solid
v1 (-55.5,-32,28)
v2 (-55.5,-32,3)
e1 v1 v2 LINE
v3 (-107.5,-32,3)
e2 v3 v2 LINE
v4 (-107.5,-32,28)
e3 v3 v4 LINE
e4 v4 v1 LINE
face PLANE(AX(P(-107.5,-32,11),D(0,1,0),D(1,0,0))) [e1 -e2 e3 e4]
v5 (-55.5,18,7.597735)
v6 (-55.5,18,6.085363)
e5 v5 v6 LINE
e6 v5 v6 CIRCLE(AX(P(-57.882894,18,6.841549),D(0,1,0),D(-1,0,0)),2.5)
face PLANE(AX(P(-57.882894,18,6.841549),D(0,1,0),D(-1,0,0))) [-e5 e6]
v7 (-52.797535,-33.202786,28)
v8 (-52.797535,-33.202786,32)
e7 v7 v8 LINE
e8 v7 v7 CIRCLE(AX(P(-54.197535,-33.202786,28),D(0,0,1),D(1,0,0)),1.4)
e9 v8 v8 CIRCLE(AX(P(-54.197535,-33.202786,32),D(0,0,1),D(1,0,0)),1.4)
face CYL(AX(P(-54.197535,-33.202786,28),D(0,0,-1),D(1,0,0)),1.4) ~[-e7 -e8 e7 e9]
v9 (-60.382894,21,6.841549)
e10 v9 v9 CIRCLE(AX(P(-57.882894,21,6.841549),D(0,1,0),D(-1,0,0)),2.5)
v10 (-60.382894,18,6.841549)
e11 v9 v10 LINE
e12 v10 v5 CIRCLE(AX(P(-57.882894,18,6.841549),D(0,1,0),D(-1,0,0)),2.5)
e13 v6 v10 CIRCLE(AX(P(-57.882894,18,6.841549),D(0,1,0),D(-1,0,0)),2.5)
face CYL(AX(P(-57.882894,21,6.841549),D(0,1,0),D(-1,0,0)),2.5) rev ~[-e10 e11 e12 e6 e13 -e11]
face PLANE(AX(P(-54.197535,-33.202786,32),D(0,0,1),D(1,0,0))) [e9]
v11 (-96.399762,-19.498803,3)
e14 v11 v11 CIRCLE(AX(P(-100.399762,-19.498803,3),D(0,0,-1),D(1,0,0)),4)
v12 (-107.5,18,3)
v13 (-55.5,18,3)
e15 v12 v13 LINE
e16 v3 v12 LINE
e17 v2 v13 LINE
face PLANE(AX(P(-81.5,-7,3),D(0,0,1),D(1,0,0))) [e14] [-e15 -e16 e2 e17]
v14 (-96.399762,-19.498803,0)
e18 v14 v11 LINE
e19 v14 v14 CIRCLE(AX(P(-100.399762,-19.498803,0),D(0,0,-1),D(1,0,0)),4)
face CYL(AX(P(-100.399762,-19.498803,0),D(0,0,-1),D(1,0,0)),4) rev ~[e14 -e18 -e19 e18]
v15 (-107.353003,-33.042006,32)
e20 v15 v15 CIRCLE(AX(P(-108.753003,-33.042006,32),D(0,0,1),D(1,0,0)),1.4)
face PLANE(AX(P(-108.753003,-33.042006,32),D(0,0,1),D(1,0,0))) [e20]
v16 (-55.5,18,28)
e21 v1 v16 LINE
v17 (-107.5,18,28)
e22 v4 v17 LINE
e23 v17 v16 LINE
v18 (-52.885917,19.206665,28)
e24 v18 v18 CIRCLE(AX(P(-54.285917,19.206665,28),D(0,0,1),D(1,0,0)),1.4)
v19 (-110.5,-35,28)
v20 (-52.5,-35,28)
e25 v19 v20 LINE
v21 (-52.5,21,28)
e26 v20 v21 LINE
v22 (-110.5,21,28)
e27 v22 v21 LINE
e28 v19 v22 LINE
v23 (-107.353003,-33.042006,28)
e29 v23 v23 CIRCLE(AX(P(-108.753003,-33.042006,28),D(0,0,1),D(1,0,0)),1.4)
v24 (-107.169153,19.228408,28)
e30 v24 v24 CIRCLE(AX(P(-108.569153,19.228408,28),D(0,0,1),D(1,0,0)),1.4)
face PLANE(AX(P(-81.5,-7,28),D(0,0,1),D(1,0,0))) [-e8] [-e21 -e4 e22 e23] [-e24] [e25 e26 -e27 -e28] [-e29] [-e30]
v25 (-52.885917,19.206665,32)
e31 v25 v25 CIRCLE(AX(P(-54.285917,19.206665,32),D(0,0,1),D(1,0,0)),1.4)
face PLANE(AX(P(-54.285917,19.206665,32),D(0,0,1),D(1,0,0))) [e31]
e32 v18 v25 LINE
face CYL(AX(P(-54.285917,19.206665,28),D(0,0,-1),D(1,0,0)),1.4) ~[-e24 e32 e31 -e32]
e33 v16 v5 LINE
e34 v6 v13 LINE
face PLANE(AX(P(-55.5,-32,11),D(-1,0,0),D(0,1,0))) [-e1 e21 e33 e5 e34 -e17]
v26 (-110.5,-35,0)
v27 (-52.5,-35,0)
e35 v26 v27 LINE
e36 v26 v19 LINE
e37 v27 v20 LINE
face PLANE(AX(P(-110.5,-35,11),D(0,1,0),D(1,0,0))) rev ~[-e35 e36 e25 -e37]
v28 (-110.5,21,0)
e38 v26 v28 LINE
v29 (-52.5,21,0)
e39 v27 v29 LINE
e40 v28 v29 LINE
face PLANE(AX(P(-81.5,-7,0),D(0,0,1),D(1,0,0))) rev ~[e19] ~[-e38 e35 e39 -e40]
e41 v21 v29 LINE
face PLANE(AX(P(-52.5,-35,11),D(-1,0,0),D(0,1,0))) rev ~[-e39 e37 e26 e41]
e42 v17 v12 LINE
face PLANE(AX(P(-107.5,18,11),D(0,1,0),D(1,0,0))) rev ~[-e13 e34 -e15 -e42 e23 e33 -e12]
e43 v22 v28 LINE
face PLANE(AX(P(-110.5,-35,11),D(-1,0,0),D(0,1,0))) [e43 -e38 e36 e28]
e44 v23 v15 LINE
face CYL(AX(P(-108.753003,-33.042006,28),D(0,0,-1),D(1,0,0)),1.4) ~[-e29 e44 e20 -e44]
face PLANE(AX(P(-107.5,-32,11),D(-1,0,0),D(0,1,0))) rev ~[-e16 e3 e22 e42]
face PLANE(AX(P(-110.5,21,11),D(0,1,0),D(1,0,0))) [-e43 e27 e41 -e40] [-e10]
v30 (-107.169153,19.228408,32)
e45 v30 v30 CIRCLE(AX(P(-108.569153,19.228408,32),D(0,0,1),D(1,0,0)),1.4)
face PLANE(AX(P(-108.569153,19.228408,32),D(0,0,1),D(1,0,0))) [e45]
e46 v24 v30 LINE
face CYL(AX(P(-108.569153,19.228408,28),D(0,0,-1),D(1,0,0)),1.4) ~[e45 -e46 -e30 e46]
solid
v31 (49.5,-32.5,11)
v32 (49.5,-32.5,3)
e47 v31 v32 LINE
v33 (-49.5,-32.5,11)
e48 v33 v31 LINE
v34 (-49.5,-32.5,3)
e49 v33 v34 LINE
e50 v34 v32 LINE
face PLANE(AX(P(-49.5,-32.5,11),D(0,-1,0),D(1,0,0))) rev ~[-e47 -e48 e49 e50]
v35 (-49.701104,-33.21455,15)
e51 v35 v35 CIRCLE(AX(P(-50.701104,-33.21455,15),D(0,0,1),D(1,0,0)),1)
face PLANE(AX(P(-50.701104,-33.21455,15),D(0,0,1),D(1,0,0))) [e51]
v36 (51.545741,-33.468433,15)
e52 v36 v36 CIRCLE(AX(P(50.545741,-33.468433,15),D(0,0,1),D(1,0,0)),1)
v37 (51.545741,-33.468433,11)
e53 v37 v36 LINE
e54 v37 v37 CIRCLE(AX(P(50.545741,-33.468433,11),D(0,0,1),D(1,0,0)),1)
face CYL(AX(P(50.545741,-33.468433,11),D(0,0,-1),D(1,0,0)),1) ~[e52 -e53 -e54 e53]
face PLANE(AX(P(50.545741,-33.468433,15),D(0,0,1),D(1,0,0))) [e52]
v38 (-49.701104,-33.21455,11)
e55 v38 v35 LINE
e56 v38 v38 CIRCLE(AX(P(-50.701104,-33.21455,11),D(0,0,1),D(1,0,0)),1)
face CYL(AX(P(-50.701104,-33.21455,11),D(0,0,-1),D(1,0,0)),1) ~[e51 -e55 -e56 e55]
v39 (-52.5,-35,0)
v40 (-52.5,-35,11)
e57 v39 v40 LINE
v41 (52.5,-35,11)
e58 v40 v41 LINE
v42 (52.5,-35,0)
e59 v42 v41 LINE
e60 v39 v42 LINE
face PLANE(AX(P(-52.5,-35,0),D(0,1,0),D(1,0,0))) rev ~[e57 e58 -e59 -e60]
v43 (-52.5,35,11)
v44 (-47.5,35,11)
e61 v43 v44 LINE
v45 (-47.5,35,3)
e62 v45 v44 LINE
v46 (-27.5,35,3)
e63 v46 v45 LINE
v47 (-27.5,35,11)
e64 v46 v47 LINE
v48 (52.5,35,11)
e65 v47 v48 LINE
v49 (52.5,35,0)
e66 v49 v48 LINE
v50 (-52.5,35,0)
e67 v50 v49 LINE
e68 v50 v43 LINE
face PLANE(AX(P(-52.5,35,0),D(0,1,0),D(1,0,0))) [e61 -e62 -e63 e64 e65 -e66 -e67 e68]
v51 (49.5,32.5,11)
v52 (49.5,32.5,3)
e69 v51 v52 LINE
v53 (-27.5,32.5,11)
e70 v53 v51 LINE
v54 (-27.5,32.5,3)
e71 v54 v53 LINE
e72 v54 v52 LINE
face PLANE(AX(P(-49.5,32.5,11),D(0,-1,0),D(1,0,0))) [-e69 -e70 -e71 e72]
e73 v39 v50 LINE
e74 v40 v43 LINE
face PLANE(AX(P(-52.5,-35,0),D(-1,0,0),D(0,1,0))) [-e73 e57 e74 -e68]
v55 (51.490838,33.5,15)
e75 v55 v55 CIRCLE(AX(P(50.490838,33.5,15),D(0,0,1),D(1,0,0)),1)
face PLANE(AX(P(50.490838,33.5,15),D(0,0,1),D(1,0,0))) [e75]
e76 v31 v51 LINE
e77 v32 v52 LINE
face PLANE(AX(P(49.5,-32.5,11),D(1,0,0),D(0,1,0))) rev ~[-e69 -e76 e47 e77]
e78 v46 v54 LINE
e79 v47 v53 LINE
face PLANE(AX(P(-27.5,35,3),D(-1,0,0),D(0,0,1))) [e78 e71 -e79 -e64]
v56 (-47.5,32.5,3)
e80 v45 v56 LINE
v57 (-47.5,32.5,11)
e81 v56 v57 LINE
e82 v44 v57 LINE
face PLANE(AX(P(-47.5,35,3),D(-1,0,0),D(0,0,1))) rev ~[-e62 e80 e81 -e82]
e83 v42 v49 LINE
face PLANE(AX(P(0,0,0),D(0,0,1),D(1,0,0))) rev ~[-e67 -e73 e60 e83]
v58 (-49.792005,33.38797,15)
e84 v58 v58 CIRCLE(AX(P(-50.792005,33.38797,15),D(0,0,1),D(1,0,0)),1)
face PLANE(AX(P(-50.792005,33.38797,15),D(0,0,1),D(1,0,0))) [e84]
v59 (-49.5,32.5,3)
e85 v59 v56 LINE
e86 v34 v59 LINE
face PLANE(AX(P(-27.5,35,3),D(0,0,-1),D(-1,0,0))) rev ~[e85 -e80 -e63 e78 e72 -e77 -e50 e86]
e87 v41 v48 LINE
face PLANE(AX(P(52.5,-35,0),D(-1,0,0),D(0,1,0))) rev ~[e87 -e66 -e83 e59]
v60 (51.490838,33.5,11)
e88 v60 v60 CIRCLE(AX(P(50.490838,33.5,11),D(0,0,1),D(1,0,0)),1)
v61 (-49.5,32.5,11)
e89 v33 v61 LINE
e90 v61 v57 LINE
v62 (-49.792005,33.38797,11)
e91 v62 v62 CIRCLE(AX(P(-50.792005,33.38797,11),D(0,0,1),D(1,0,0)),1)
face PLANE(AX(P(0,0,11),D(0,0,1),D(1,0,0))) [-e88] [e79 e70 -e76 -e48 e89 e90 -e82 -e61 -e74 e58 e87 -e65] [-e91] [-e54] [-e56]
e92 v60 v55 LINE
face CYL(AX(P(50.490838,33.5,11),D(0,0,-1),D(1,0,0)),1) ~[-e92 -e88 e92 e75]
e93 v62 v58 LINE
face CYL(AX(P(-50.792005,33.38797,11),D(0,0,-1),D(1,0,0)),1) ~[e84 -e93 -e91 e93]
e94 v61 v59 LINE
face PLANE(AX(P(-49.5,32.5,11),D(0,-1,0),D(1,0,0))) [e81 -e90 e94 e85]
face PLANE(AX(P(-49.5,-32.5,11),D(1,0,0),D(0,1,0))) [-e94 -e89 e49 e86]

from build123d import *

# Parameters (mm, degrees)
F1_W      = 58
F1_H      = 56
F2_DEPTH  = 11
F0_W      = 105
F0_H      = 70
F3_W      = 99
F3_H      = 65
F4_DEPTH  = 8
F5_W      = 20
F5_H      = 8
F6_DEPTH  = 2.5
F7_W      = 52
F7_H      = 50
F8_DEPTH  = 8
F9_R      = 4
F10_DEPTH = 4
F11_DEPTH = 17
F12_R     = 2.5
F13_DEPTH = 3
F14_R     = 1.4
F15_DEPTH = 4
F16_R     = 1.4
F17_DEPTH = 4
F18_R     = 1
F19_DEPTH = 4
F20_R     = 1
F21_DEPTH = 4
F22_R     = 1
F23_DEPTH = 4
F24_R     = 1
F25_DEPTH = 4


with BuildPart() as f2:
    # F1 (on Top) → F2 (new body)
    with BuildSketch(Plane.XY):
        with Locations((-81.5, -7)):
            Rectangle(F1_W, F1_H)
    extrude(amount=F2_DEPTH)

    # F7 (on face) → F8 (cut)
    with BuildSketch(Plane.XY.offset(11)):
        with Locations((-81.5, -7)):
            Rectangle(F7_W, F7_H)
    extrude(amount=-F8_DEPTH, mode=Mode.SUBTRACT)

    # F9 (on face) → F10 (cut)
    with BuildSketch(Plane(origin=(0, 0, 0), x_dir=(1, 0, 0), z_dir=(0, 0, -1))):
        with Locations((-100.399762392, 19.4988027215)):
            Circle(F9_R)
    extrude(amount=-F10_DEPTH, mode=Mode.SUBTRACT)

    # F11 (add): a face of the model
    f11_faces = [f2.faces().sort_by_distance(p)[0] for p in [
        (-53.3062257748, -7, 11),
    ]]
    extrude(f11_faces, amount=F11_DEPTH)

    # F12 (on face) → F13 (cut)
    with BuildSketch(Plane(origin=(0, 21, 0), x_dir=(-1, 0, 0), z_dir=(0, 1, 0))):
        with Locations((57.8828938305, 6.8415487185)):
            Circle(F12_R)
    extrude(amount=-F13_DEPTH, mode=Mode.SUBTRACT)

    # F14 (on face) → F15 (join)
    with BuildSketch(Plane.XY.offset(28)):
        with Locations((-108.5691526532, 19.2284081131)):
            Circle(F14_R)
    extrude(amount=F15_DEPTH)

    # F16 (on face) → F17 (join)
    with BuildSketch(Plane.XY.offset(28)):
        with Locations((-108.75300318, -33.0420061946)):
            Circle(F16_R)
        with Locations((-54.1975349188, -33.2027859986)):
            Circle(F16_R)
        with Locations((-54.2859174311, 19.2066654563)):
            Circle(F16_R)
    extrude(amount=F17_DEPTH)


with BuildPart() as f2b:
    # F0 (on Top) → F2, piece 2 (new body)
    with BuildSketch(Plane.XY):
        Rectangle(F0_W, F0_H)
    extrude(amount=F2_DEPTH)

    # F3 (on face) → F4 (cut)
    with BuildSketch(Plane.XY.offset(11)):
        Rectangle(F3_W, F3_H)
    extrude(amount=-F4_DEPTH, mode=Mode.SUBTRACT)

    # F5 (on face) → F6 (cut)
    with BuildSketch(Plane(origin=(0, 35, 0), x_dir=(-1, 0, 0), z_dir=(0, 1, 0))):
        with Locations((37.5, 7)):
            Rectangle(F5_W, F5_H)
    extrude(amount=-F6_DEPTH, mode=Mode.SUBTRACT)

    # F18 (on face) → F19 (join)
    with BuildSketch(Plane.XY.offset(11)):
        with Locations((-50.7920049131, 33.3879701793)):
            Circle(F18_R)
    extrude(amount=F19_DEPTH)

    # F20 (on face) → F21 (join)
    with BuildSketch(Plane.XY.offset(11)):
        with Locations((50.4908375442, 33.5)):
            Circle(F20_R)
    extrude(amount=F21_DEPTH)

    # F22 (on face) → F23 (join)
    with BuildSketch(Plane.XY.offset(11)):
        with Locations((50.5457408726, -33.4684327245)):
            Circle(F22_R)
    extrude(amount=F23_DEPTH)

    # F24 (on face) → F25 (join)
    with BuildSketch(Plane.XY.offset(11)):
        with Locations((-50.7011041045, -33.2145504653)):
            Circle(F24_R)
    extrude(amount=F25_DEPTH)


solid = Compound([f2.part, f2b.part])
